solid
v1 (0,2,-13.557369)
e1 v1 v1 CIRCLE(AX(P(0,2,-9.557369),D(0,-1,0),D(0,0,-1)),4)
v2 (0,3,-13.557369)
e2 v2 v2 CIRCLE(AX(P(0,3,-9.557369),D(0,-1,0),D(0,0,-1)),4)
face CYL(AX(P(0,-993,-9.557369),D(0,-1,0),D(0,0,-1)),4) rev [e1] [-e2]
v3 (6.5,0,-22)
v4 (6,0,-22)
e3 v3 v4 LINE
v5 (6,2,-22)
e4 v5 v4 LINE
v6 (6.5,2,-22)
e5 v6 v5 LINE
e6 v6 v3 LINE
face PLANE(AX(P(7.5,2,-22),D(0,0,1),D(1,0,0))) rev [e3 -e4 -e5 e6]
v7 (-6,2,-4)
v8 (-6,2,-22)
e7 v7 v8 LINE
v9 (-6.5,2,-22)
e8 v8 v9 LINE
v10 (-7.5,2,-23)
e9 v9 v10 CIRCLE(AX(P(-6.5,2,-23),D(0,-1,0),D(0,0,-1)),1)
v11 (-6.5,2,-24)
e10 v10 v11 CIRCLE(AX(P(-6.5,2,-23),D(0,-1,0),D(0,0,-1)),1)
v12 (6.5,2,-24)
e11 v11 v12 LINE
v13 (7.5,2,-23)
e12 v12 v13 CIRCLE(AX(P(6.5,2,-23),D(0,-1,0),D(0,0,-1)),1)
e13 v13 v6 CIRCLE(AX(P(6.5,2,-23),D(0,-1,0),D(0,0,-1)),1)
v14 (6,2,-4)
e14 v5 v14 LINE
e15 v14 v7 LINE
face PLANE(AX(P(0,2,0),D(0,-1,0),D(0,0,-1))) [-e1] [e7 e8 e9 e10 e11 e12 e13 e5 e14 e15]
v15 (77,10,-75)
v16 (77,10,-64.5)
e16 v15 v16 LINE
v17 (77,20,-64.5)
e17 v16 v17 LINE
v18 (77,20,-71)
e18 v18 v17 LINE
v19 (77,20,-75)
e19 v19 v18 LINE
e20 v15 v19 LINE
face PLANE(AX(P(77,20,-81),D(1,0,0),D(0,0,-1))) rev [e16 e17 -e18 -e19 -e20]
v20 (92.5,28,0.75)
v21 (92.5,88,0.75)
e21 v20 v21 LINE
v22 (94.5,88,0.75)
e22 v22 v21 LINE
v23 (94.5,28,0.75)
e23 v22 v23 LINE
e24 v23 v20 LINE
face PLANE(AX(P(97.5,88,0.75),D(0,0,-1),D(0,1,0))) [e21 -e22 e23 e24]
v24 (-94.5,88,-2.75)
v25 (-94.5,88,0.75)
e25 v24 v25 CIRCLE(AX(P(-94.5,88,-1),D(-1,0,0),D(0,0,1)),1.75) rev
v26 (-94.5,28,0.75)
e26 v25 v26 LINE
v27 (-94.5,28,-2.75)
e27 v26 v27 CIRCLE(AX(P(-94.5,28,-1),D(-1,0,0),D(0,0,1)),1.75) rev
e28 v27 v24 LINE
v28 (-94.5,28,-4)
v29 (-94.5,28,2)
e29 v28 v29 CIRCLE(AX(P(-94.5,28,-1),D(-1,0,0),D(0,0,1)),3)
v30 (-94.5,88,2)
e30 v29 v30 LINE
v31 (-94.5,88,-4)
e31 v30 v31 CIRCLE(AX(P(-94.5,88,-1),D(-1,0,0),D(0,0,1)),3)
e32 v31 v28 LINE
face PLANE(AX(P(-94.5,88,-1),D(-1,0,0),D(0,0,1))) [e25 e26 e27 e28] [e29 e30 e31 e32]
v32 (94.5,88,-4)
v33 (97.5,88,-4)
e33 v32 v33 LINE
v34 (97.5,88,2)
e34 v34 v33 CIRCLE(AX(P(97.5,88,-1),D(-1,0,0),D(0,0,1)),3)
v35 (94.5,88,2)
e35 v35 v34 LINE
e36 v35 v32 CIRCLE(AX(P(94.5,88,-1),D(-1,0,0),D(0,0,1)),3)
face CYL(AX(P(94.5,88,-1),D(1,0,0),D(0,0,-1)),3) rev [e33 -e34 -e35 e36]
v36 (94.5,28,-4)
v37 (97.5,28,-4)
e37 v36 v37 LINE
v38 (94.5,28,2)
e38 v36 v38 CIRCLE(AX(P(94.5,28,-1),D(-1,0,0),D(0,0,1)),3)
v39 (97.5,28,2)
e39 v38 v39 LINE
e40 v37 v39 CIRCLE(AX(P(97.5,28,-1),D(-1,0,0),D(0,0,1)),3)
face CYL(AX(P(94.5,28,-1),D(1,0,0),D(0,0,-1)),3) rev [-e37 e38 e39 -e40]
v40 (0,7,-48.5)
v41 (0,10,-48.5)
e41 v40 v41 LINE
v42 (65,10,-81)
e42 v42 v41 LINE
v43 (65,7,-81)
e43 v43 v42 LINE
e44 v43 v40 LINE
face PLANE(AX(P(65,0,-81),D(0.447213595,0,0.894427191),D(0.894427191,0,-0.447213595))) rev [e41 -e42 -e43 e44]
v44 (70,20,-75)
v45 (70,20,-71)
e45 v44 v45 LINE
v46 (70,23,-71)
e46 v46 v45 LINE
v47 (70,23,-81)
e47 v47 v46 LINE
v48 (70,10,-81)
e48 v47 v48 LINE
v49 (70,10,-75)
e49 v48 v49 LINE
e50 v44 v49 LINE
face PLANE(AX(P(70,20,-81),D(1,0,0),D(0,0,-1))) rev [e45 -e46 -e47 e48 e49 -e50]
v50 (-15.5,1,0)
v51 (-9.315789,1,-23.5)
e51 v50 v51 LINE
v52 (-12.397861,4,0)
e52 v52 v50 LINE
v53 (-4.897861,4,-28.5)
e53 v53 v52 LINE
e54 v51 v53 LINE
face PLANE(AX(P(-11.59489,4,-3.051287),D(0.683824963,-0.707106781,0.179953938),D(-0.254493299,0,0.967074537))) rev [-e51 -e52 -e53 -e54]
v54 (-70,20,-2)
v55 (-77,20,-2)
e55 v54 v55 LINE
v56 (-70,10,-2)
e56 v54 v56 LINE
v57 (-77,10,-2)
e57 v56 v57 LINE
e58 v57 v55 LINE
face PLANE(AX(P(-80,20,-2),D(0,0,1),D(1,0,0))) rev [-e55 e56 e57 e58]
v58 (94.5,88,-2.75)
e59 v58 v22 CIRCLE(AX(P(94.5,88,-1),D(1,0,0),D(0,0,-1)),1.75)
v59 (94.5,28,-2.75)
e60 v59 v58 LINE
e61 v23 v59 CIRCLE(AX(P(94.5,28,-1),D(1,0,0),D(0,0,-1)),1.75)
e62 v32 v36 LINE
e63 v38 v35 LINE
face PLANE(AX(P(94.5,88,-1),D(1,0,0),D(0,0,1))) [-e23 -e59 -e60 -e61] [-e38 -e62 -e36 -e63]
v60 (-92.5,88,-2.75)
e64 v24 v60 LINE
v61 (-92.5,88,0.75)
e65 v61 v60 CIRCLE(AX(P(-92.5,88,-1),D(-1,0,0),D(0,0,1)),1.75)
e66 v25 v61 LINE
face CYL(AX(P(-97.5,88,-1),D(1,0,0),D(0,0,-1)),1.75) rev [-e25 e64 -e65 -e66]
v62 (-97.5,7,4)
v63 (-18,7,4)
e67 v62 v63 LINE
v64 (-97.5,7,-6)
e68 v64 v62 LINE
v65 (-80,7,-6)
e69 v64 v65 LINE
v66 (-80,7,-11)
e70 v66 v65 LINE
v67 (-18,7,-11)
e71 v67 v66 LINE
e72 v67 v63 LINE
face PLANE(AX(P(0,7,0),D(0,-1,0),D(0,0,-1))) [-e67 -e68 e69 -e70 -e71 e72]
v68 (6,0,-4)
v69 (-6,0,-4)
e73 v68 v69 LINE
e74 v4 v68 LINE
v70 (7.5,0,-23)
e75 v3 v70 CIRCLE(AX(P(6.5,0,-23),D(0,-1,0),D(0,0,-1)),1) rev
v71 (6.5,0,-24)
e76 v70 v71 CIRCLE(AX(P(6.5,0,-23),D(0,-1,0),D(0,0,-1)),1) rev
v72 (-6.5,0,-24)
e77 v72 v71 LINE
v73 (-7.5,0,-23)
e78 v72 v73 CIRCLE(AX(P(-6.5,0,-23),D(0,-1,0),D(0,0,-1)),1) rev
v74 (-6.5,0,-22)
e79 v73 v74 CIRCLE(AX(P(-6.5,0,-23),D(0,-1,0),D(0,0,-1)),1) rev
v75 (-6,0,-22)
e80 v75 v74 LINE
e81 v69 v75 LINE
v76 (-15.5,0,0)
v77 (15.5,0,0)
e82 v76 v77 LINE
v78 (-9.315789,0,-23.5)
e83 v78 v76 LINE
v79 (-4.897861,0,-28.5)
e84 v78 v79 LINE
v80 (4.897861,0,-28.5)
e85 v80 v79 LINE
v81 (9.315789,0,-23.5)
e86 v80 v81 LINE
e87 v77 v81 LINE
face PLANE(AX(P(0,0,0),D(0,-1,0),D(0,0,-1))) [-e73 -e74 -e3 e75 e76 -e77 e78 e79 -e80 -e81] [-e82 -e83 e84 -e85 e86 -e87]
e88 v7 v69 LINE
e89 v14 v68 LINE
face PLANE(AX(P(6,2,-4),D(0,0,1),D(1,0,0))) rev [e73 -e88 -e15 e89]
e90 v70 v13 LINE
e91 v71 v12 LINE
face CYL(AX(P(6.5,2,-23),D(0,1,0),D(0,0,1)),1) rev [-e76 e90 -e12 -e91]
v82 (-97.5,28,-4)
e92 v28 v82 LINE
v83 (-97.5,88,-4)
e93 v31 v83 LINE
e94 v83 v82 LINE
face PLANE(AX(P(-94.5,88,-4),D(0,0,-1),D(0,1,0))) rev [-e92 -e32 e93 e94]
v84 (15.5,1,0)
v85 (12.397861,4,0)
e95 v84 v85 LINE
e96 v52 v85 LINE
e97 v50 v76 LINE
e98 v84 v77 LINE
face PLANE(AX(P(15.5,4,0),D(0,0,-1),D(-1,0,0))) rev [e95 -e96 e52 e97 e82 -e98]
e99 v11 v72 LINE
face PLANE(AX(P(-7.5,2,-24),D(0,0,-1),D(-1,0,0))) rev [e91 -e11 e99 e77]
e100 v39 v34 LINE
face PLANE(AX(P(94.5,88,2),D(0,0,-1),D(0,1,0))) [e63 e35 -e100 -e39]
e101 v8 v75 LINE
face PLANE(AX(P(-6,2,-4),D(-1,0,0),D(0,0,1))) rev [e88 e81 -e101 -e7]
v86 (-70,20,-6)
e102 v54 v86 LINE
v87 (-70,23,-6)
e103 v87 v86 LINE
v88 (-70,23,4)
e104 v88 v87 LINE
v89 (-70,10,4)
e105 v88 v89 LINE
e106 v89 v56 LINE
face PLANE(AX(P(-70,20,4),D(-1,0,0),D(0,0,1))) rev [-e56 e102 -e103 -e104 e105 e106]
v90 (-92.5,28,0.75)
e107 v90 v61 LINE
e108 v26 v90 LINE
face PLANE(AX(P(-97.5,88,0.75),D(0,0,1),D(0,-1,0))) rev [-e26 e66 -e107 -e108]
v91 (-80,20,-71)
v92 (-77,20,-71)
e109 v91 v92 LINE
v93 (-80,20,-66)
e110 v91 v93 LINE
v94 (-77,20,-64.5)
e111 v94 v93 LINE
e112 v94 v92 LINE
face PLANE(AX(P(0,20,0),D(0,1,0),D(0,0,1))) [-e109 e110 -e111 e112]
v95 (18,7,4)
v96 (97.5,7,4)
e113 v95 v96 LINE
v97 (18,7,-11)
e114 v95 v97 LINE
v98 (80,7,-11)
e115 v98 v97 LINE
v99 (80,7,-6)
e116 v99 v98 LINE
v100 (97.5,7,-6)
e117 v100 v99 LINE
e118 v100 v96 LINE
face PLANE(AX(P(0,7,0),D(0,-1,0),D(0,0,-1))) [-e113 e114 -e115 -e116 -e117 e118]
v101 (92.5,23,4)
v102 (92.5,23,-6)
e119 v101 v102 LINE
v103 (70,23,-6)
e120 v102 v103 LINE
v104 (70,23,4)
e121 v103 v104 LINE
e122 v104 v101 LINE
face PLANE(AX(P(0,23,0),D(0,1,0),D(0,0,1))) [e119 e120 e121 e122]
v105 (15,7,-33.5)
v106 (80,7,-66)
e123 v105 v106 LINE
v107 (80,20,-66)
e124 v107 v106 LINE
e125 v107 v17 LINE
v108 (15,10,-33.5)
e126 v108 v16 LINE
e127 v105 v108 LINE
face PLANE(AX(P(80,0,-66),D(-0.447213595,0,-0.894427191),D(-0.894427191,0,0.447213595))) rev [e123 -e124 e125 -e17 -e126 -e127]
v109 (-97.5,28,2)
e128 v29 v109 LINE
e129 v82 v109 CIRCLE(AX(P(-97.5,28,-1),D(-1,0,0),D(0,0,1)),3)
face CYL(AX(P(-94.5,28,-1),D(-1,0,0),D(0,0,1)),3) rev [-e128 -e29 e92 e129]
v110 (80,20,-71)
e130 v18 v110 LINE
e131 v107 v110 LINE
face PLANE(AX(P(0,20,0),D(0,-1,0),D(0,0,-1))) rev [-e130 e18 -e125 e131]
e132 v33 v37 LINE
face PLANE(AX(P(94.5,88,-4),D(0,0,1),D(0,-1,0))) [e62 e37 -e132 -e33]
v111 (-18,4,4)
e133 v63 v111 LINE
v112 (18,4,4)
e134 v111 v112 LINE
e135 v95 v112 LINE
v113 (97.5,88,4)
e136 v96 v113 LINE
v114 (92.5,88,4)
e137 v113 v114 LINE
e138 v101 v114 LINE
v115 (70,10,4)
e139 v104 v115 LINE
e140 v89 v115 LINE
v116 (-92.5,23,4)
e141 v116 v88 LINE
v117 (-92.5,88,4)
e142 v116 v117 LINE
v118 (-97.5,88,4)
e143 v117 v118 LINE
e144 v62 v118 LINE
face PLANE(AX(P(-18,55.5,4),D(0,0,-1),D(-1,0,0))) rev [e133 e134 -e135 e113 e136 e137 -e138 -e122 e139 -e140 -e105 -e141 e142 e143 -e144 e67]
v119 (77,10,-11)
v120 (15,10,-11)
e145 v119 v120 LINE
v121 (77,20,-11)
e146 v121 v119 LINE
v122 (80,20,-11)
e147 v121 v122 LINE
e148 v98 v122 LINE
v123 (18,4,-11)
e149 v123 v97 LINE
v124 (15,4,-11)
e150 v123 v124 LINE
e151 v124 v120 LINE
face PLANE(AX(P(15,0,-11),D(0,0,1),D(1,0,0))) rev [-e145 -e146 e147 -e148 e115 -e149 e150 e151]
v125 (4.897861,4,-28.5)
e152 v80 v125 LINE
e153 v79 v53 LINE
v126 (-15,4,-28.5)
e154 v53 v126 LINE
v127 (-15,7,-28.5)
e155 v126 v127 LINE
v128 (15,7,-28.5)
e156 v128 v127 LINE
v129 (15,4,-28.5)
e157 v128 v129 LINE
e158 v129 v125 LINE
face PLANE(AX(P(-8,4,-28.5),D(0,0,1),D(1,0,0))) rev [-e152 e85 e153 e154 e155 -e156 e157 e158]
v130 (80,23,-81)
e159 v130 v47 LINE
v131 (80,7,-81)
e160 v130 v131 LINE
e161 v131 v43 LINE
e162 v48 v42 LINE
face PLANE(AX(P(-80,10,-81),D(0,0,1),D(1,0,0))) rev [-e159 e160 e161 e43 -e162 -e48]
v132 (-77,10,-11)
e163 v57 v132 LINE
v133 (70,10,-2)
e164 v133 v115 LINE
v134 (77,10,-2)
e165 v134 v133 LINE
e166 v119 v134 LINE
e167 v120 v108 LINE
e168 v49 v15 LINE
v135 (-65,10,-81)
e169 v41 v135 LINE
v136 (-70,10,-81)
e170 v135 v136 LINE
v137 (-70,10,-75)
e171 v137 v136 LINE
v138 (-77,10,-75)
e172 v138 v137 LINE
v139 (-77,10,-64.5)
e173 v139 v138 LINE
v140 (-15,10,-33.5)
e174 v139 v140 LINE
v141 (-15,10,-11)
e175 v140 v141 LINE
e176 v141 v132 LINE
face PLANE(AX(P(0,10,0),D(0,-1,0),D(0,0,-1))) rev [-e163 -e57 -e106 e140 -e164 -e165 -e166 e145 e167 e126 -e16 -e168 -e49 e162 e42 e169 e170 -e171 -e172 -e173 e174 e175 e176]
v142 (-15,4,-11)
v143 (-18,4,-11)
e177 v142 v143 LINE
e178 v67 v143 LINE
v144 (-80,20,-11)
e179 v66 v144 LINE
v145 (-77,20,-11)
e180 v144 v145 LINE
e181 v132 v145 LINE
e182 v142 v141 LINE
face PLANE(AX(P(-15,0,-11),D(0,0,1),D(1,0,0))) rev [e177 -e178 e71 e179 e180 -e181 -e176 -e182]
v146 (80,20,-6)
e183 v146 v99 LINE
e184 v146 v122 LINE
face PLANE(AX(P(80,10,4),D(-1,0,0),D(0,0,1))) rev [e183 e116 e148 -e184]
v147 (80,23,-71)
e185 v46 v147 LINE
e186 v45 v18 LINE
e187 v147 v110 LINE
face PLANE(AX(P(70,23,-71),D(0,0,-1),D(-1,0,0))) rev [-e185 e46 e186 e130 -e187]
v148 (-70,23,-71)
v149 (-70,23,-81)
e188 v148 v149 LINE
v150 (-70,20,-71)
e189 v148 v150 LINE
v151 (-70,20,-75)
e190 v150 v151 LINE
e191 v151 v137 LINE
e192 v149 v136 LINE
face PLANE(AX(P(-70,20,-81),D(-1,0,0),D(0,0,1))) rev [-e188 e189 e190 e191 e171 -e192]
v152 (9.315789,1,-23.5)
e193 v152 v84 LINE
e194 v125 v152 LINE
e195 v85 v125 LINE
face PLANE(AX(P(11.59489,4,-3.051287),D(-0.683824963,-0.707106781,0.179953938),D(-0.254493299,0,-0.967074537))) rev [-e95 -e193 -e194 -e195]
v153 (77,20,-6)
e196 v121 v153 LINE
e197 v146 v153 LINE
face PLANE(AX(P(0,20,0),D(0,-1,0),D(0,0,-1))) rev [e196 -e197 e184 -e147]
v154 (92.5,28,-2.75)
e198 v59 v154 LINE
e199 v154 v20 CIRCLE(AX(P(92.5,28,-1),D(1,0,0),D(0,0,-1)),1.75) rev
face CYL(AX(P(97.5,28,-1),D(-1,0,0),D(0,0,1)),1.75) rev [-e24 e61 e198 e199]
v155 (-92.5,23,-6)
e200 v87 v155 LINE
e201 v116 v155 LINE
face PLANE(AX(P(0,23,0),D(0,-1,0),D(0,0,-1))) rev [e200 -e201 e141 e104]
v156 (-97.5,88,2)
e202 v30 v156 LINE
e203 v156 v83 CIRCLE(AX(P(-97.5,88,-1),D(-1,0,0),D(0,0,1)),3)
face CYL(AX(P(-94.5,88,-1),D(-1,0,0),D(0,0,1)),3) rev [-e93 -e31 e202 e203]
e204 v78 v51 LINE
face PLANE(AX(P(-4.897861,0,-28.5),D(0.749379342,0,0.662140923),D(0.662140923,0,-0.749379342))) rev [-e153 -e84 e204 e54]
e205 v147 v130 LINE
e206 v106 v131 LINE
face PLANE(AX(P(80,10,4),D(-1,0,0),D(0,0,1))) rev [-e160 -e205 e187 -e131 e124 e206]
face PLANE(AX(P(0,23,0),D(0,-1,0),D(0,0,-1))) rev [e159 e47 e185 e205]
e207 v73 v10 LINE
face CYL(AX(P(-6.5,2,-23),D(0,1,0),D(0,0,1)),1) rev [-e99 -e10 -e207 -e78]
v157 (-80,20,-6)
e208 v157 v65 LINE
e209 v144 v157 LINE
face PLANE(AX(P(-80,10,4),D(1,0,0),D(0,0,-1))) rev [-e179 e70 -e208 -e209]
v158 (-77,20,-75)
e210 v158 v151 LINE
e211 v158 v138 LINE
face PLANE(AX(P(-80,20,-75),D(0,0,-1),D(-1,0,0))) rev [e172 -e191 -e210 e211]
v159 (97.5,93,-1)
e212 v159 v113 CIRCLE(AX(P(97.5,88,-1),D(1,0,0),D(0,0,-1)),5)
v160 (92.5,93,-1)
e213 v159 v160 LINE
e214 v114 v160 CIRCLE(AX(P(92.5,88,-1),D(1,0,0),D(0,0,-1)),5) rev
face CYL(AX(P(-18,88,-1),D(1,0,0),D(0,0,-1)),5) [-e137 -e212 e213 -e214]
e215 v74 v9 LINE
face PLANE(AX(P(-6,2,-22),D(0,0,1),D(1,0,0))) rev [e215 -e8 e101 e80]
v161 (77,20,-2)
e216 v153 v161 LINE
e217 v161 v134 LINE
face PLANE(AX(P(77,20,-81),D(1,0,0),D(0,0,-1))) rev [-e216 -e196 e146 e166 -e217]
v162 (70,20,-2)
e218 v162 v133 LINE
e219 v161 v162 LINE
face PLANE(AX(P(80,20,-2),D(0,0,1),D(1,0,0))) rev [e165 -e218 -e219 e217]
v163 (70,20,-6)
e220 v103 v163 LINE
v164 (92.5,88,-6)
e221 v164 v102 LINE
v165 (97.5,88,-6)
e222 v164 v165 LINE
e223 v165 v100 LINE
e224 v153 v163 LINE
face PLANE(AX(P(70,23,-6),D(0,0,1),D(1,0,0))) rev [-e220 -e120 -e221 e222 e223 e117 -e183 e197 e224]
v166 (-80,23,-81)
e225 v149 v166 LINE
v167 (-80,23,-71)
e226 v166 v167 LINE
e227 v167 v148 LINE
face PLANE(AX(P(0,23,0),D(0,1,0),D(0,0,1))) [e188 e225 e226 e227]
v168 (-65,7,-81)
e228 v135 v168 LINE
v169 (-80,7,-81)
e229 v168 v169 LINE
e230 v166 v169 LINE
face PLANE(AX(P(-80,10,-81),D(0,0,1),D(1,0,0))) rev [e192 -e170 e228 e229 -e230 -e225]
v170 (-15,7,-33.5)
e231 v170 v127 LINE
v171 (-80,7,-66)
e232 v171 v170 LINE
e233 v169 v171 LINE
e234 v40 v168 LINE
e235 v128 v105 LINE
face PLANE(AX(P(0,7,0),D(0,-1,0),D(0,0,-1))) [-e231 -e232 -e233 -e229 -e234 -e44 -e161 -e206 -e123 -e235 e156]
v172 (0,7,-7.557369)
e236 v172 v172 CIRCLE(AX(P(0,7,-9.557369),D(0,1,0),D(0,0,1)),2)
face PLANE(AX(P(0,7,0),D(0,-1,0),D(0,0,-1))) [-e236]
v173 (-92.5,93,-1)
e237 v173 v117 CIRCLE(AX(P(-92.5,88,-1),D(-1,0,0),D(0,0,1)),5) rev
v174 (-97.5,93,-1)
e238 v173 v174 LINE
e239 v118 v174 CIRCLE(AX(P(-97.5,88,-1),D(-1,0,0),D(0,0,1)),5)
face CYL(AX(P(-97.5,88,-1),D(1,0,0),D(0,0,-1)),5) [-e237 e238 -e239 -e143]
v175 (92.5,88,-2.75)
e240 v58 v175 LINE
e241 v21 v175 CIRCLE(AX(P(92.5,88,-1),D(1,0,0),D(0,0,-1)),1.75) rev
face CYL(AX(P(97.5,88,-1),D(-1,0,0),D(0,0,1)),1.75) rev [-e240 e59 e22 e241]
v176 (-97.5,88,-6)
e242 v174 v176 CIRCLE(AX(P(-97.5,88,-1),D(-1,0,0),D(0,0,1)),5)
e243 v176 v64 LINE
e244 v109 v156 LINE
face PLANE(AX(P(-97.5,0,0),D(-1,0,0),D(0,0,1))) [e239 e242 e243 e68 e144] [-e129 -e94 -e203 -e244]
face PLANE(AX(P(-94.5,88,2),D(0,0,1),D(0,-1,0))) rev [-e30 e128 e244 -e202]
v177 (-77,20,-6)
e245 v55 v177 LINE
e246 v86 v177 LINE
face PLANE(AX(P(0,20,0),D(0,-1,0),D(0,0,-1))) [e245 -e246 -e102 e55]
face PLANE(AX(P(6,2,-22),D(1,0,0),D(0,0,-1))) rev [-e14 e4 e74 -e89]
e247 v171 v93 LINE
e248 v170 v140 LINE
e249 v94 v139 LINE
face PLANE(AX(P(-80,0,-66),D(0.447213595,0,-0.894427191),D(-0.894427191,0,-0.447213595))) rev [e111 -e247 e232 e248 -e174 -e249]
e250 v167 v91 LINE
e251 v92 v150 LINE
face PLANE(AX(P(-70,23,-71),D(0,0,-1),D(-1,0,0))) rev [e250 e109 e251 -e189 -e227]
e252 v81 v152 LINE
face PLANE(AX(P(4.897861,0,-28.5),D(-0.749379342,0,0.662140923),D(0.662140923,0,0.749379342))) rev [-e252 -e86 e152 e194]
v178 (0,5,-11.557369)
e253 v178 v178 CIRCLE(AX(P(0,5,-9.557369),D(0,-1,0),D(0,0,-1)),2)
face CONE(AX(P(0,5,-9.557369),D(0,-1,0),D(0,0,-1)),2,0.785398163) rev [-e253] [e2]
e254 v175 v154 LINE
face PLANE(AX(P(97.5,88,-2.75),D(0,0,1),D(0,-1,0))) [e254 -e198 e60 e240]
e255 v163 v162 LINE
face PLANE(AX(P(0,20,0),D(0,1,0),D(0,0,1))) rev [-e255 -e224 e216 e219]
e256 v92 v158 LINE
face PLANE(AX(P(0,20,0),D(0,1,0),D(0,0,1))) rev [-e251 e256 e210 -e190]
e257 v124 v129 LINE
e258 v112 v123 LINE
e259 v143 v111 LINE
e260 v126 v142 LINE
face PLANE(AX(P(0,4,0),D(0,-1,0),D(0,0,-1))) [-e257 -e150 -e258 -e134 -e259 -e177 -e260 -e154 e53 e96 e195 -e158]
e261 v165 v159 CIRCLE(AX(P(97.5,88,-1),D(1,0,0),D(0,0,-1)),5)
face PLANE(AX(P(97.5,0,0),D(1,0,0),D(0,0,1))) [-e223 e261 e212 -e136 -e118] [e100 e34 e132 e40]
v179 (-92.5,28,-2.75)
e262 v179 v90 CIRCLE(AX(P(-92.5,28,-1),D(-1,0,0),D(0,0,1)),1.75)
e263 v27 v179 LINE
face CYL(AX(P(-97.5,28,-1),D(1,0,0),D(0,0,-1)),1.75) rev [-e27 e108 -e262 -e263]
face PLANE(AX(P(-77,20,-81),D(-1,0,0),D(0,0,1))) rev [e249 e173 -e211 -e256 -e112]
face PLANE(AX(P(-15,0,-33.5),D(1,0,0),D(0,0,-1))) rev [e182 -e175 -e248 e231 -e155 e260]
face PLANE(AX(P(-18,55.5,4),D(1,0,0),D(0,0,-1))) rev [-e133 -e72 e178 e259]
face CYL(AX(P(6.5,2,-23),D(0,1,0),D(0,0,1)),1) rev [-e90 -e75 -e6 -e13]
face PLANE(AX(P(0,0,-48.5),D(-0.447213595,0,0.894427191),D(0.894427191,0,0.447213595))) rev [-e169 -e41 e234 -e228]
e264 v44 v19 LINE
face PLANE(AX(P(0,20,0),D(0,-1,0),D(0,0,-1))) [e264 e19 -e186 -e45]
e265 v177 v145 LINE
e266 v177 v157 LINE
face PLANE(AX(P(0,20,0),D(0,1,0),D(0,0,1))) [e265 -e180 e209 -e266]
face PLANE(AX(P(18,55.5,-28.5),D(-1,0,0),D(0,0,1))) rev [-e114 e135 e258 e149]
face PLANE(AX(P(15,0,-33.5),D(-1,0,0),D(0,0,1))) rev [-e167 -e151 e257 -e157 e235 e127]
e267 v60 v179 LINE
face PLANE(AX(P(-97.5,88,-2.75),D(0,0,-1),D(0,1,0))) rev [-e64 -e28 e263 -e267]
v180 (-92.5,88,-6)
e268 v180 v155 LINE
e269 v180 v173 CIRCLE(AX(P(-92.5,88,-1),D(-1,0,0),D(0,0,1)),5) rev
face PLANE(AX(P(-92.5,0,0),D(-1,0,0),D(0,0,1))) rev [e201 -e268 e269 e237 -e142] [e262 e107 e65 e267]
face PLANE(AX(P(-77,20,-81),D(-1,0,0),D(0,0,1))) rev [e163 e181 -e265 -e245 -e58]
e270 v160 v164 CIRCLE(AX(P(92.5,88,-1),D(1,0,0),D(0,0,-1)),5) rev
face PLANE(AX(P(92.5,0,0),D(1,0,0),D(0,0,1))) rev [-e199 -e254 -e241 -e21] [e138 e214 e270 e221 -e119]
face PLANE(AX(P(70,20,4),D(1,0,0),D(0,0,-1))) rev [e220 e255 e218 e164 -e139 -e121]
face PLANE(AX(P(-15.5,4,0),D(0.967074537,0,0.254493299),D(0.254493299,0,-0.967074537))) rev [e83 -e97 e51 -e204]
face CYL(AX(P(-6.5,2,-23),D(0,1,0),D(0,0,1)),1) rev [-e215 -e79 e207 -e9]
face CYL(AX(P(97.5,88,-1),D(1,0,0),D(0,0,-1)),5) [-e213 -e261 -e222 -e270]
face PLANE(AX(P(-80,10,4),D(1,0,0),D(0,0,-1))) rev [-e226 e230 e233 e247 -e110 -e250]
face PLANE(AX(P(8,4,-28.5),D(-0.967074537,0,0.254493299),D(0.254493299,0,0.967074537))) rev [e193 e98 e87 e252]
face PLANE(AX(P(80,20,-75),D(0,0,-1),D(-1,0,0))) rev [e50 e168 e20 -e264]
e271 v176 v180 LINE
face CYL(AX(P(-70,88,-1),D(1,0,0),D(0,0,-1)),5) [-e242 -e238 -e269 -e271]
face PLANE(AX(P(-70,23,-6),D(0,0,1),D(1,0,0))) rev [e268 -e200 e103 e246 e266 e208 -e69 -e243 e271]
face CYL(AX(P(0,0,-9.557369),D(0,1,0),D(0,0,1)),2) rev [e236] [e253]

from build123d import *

# Parameters (mm, degrees)
EXTRUDE_1_DEPTH        = 4
CHAMFER_1_SIZE         = 3
CUT_EXTRUDE_1_DEPTH    = 33.687918257
SKETCH_3_R             = 9.557368967
EXTRUDE_2_DEPTH        = 3
CUT_EXTRUDE_2_DEPTH    = 2
SKETCH_7_R             = 2
CUT_EXTRUDE_3_DEPTH    = 34.188853551
FILLET_2_R             = 1
SKETCH_9_W             = 36
SKETCH_9_H             = 32.5
SKETCH_9_R             = 9.557368967
EXTRUDE_4_DEPTH        = 3
SKETCH_10_W            = 160
SKETCH_10_H            = 85
EXTRUDE_5_DEPTH        = 3
SKETCH_11_W            = 3
SKETCH_11_H            = 85
EXTRUDE_6_DEPTH        = 10
SKETCH_12_W            = 10
SKETCH_12_H            = 6
EXTRUDE_7_DEPTH        = 10
SKETCH_13_W            = 10
SKETCH_13_H            = 10
EXTRUDE_8_DEPTH        = 3
SKETCH_15_W            = 10
SKETCH_15_H            = 16
EXTRUDE_10_DEPTH       = 12.5
SKETCH_17_W            = 10
SKETCH_17_H            = 86
EXTRUDE_11_DEPTH       = 5
CUT_EXTRUDE_5_DEPTH    = 213.052469922
CUT_EXTRUDE_6_DEPTH    = 3
FILLET_3_R             = 5
FILLET_3_OF_MIRROR_2_R = 5
CUT_EXTRUDE_7_DEPTH    = 147.274570586


with BuildPart() as part:
    # 草图1 → 凸台-拉伸1 (new body)
    with BuildSketch(Plane(origin=(0, 0, 0), x_dir=(1, 0, 0), z_dir=(0, 1, 0))):
        Polygon((-8, 28.5), (8, 28.5), (15.5, 0), (-15.5, 0), align=None)
    extrude(amount=EXTRUDE_1_DEPTH)

    # Chamfer 1
    chamfer_1_edges = [part.edges().sort_by_distance(p)[0] for p in [
        (11.75, 4, -14.25),
        (-11.75, 4, -14.25),
    ]]
    chamfer(chamfer_1_edges, length=CHAMFER_1_SIZE)

    # 草图2 → 切除-拉伸1 (cut, through all)
    with BuildSketch(Plane(origin=(0, 4, 0), x_dir=(1, 0, 0), z_dir=(0, 1, 0))):
        Polygon((-4.897860626, 28.5), (-9.315789474, 23.5), (-9.315789474, 28.5), align=None)
        Polygon((9.315789474, 28.5), (4.897860626, 28.5), (9.315789474, 23.5), align=None)
    extrude(amount=-CUT_EXTRUDE_1_DEPTH, mode=Mode.SUBTRACT)

    # 草图3 → 凸台-拉伸2 (add)
    with BuildSketch(Plane(origin=(0, 4, 0), x_dir=(1, 0, 0), z_dir=(0, 1, 0))):
        with Locations(Location((0, 9.557368967, 0), (0, 0, 270))):
            Circle(SKETCH_3_R)
    extrude(amount=EXTRUDE_2_DEPTH)

    # 草图5 → 切除-拉伸2 (cut)
    with BuildSketch(Plane.XZ):
        Polygon((-7.5, -24), (7.5, -24), (7.5, -22), (6, -22), (6, -4), (-6, -4), (-6, -22), (-7.5, -22), align=None)
    extrude(amount=-CUT_EXTRUDE_2_DEPTH, mode=Mode.SUBTRACT)

    # 草图7 → 切除-拉伸3 (cut, through all)
    with BuildSketch(Plane(origin=(0, 7, 0), x_dir=(1, 0, 0), z_dir=(0, 1, 0))):
        with Locations(Location((0, 9.557368967, 0), (0, 0, 270))):
            Circle(SKETCH_7_R)
    extrude(amount=-CUT_EXTRUDE_3_DEPTH, mode=Mode.SUBTRACT)

    # 草图8 → 切除-旋转1 (revolve, cut)
    with BuildSketch(Plane(origin=(0, 0, 0), x_dir=(0, 0, -1), z_dir=(1, 0, 0)), mode=Mode.PRIVATE) as cut_revolve_1_sk:
        Polygon((7.557368967, 5), (5.557368967, 3), (5.557368967, 2), (9.557368967, 2), (9.557368967, 5), align=None)
    revolve(cut_revolve_1_sk.sketch.rotate(Axis((0, -993, -9.557368967), (0, 1, 0)), 180), axis=Axis((0, -993, -9.557368967), (0, 1, 0)), mode=Mode.SUBTRACT)

    # 圆角2
    fillet_2_edges = [part.edges().sort_by_distance(p)[0] for p in [
        (-7.5, 1, -22),
        (-7.5, 1, -24),
        (7.5, 1, -24),
        (7.5, 1, -22),
    ]]
    fillet(fillet_2_edges, radius=FILLET_2_R - 0.0001)  # a hair under: the kernel refuses the full size

    # 草图9 → 凸台-拉伸4 (add)
    with BuildSketch(Plane(origin=(0, 4, 0), x_dir=(1, 0, 0), z_dir=(0, 1, 0))):
        with Locations((0, 12.25)):
            Rectangle(SKETCH_9_W, SKETCH_9_H)
        with Locations((0, 9.557368967)):
            Circle(SKETCH_9_R, mode=Mode.SUBTRACT)
    extrude(amount=EXTRUDE_4_DEPTH)

    # 草图10 → 凸台-拉伸5 (add)
    with BuildSketch(Plane(origin=(0, 7, 0), x_dir=(1, 0, 0), z_dir=(0, 1, 0))):
        with Locations((0, 38.5)):
            Rectangle(SKETCH_10_W, SKETCH_10_H)
    extrude(amount=EXTRUDE_5_DEPTH)

    # 草图11 → 凸台-拉伸6 (add)
    with BuildSketch(Plane(origin=(0, 10, 0), x_dir=(1, 0, 0), z_dir=(0, 1, 0))):
        with Locations((-78.5, 38.5)):
            Rectangle(SKETCH_11_W, SKETCH_11_H)
        with Locations((78.5, 38.5)):
            Rectangle(SKETCH_11_W, SKETCH_11_H)
    extrude(amount=EXTRUDE_6_DEPTH)

    # 草图12 → 凸台-拉伸7 (add)
    with BuildSketch(Plane(origin=(0, 10, 0), x_dir=(1, 0, 0), z_dir=(0, 1, 0))):
        with Locations((-75, 78)):
            Rectangle(SKETCH_12_W, SKETCH_12_H)
        with Locations((75, 78)):
            Rectangle(SKETCH_12_W, SKETCH_12_H)
        with Locations((75, -1)):
            Rectangle(SKETCH_12_W, SKETCH_12_H)
        with Locations((-75, -1)):
            Rectangle(SKETCH_12_W, SKETCH_12_H)
    extrude(amount=EXTRUDE_7_DEPTH)

    # 草图13 → 凸台-拉伸8 (add)
    with BuildSketch(Plane(origin=(0, 20, 0), x_dir=(1, 0, 0), z_dir=(0, 1, 0))):
        with Locations((-75, 76)):
            Rectangle(SKETCH_13_W, SKETCH_13_H)
        with Locations((-75, 1)):
            Rectangle(SKETCH_13_W, SKETCH_13_H)
        with Locations((75, 76)):
            Rectangle(SKETCH_13_W, SKETCH_13_H)
        with Locations((75, 1)):
            Rectangle(SKETCH_13_W, SKETCH_13_H)
    extrude(amount=EXTRUDE_8_DEPTH)

    # 草图15 → 凸台-拉伸10 (add)
    with BuildSketch(Plane.ZY.offset(80)):
        with Locations((-1, 15)):
            Rectangle(SKETCH_15_W, SKETCH_15_H)
    extrude_10 = extrude(amount=EXTRUDE_10_DEPTH)

    # 草图17 → 凸台-拉伸11 (add)
    with BuildSketch(Plane.ZY.offset(92.5)):
        with Locations((-1, 50)):
            Rectangle(SKETCH_17_W, SKETCH_17_H)
    extrude_11 = extrude(amount=EXTRUDE_11_DEPTH)

    # 草图19 → 切除-拉伸5 (cut, symmetric)
    with BuildSketch(Plane(origin=(-92.5, 0, 0), x_dir=(0, 0, -1), z_dir=(1, 0, 0))):
        with BuildLine():
            Line((2.75, 88), (2.75, 28))
            ThreePointArc((2.75, 28), (1, 26.25), (-0.75, 28))
            Line((-0.75, 28), (-0.75, 88))
            ThreePointArc((-0.75, 88), (1, 89.75), (2.75, 88))
        make_face()
    cut_extrude_5 = extrude(amount=CUT_EXTRUDE_5_DEPTH, both=True, mode=Mode.SUBTRACT)

    # 草图20 → 切除-拉伸6 (cut)
    with BuildSketch(Plane.ZY.offset(97.5)):
        with BuildLine():
            Line((2, 88), (2, 28))
            ThreePointArc((2, 28), (-1, 25), (-4, 28))
            Line((-4, 28), (-4, 88))
            ThreePointArc((-4, 88), (-1, 91), (2, 88))
        make_face()
    cut_extrude_6 = extrude(amount=-CUT_EXTRUDE_6_DEPTH, mode=Mode.SUBTRACT)

    # 圆角3
    fillet_3_edges = [part.edges().sort_by_distance(p)[0] for p in [
        (-95, 93, 4),
        (-95, 93, -6),
    ]]
    fillet(fillet_3_edges, radius=FILLET_3_R - 0.0001)  # a hair under: the kernel refuses the full size

    # 镜向2: 凸台-拉伸10, 凸台-拉伸11, 切除-拉伸5, 切除-拉伸6 across plane
    add(extrude_10.mirror(Plane(origin=(0, 0, 0), x_dir=(0, 0, 1), z_dir=(1, 0, 0))))
    add(extrude_11.mirror(Plane(origin=(0, 0, 0), x_dir=(0, 0, 1), z_dir=(1, 0, 0))))
    add(cut_extrude_5.mirror(Plane(origin=(0, 0, 0), x_dir=(0, 0, 1), z_dir=(1, 0, 0))), mode=Mode.SUBTRACT)
    add(cut_extrude_6.mirror(Plane(origin=(0, 0, 0), x_dir=(0, 0, 1), z_dir=(1, 0, 0))), mode=Mode.SUBTRACT)

    # 圆角3 of 镜向2
    fillet_3_of_mirror_2_edges = [part.edges().sort_by_distance(p)[0] for p in [
        (95, 93, 4),
        (95, 93, -6),
    ]]
    fillet(fillet_3_of_mirror_2_edges, radius=FILLET_3_OF_MIRROR_2_R - 0.0001)  # a hair under: the kernel refuses the full size

    # 草图21 → 切除-拉伸7 (cut, through all)
    with BuildSketch(Plane(origin=(0, 20, 0), x_dir=(1, 0, 0), z_dir=(0, 1, 0))):
        Polygon((-65, 81), (65, 81), (0, 48.5), align=None)
        Polygon((-80, 66), (-15, 33.5), (-15, 11), (-80, 11), align=None)
        Polygon((15, 11), (80, 11), (80, 66), (15, 33.5), align=None)
    extrude(amount=-CUT_EXTRUDE_7_DEPTH, mode=Mode.SUBTRACT)


solid = part.part
